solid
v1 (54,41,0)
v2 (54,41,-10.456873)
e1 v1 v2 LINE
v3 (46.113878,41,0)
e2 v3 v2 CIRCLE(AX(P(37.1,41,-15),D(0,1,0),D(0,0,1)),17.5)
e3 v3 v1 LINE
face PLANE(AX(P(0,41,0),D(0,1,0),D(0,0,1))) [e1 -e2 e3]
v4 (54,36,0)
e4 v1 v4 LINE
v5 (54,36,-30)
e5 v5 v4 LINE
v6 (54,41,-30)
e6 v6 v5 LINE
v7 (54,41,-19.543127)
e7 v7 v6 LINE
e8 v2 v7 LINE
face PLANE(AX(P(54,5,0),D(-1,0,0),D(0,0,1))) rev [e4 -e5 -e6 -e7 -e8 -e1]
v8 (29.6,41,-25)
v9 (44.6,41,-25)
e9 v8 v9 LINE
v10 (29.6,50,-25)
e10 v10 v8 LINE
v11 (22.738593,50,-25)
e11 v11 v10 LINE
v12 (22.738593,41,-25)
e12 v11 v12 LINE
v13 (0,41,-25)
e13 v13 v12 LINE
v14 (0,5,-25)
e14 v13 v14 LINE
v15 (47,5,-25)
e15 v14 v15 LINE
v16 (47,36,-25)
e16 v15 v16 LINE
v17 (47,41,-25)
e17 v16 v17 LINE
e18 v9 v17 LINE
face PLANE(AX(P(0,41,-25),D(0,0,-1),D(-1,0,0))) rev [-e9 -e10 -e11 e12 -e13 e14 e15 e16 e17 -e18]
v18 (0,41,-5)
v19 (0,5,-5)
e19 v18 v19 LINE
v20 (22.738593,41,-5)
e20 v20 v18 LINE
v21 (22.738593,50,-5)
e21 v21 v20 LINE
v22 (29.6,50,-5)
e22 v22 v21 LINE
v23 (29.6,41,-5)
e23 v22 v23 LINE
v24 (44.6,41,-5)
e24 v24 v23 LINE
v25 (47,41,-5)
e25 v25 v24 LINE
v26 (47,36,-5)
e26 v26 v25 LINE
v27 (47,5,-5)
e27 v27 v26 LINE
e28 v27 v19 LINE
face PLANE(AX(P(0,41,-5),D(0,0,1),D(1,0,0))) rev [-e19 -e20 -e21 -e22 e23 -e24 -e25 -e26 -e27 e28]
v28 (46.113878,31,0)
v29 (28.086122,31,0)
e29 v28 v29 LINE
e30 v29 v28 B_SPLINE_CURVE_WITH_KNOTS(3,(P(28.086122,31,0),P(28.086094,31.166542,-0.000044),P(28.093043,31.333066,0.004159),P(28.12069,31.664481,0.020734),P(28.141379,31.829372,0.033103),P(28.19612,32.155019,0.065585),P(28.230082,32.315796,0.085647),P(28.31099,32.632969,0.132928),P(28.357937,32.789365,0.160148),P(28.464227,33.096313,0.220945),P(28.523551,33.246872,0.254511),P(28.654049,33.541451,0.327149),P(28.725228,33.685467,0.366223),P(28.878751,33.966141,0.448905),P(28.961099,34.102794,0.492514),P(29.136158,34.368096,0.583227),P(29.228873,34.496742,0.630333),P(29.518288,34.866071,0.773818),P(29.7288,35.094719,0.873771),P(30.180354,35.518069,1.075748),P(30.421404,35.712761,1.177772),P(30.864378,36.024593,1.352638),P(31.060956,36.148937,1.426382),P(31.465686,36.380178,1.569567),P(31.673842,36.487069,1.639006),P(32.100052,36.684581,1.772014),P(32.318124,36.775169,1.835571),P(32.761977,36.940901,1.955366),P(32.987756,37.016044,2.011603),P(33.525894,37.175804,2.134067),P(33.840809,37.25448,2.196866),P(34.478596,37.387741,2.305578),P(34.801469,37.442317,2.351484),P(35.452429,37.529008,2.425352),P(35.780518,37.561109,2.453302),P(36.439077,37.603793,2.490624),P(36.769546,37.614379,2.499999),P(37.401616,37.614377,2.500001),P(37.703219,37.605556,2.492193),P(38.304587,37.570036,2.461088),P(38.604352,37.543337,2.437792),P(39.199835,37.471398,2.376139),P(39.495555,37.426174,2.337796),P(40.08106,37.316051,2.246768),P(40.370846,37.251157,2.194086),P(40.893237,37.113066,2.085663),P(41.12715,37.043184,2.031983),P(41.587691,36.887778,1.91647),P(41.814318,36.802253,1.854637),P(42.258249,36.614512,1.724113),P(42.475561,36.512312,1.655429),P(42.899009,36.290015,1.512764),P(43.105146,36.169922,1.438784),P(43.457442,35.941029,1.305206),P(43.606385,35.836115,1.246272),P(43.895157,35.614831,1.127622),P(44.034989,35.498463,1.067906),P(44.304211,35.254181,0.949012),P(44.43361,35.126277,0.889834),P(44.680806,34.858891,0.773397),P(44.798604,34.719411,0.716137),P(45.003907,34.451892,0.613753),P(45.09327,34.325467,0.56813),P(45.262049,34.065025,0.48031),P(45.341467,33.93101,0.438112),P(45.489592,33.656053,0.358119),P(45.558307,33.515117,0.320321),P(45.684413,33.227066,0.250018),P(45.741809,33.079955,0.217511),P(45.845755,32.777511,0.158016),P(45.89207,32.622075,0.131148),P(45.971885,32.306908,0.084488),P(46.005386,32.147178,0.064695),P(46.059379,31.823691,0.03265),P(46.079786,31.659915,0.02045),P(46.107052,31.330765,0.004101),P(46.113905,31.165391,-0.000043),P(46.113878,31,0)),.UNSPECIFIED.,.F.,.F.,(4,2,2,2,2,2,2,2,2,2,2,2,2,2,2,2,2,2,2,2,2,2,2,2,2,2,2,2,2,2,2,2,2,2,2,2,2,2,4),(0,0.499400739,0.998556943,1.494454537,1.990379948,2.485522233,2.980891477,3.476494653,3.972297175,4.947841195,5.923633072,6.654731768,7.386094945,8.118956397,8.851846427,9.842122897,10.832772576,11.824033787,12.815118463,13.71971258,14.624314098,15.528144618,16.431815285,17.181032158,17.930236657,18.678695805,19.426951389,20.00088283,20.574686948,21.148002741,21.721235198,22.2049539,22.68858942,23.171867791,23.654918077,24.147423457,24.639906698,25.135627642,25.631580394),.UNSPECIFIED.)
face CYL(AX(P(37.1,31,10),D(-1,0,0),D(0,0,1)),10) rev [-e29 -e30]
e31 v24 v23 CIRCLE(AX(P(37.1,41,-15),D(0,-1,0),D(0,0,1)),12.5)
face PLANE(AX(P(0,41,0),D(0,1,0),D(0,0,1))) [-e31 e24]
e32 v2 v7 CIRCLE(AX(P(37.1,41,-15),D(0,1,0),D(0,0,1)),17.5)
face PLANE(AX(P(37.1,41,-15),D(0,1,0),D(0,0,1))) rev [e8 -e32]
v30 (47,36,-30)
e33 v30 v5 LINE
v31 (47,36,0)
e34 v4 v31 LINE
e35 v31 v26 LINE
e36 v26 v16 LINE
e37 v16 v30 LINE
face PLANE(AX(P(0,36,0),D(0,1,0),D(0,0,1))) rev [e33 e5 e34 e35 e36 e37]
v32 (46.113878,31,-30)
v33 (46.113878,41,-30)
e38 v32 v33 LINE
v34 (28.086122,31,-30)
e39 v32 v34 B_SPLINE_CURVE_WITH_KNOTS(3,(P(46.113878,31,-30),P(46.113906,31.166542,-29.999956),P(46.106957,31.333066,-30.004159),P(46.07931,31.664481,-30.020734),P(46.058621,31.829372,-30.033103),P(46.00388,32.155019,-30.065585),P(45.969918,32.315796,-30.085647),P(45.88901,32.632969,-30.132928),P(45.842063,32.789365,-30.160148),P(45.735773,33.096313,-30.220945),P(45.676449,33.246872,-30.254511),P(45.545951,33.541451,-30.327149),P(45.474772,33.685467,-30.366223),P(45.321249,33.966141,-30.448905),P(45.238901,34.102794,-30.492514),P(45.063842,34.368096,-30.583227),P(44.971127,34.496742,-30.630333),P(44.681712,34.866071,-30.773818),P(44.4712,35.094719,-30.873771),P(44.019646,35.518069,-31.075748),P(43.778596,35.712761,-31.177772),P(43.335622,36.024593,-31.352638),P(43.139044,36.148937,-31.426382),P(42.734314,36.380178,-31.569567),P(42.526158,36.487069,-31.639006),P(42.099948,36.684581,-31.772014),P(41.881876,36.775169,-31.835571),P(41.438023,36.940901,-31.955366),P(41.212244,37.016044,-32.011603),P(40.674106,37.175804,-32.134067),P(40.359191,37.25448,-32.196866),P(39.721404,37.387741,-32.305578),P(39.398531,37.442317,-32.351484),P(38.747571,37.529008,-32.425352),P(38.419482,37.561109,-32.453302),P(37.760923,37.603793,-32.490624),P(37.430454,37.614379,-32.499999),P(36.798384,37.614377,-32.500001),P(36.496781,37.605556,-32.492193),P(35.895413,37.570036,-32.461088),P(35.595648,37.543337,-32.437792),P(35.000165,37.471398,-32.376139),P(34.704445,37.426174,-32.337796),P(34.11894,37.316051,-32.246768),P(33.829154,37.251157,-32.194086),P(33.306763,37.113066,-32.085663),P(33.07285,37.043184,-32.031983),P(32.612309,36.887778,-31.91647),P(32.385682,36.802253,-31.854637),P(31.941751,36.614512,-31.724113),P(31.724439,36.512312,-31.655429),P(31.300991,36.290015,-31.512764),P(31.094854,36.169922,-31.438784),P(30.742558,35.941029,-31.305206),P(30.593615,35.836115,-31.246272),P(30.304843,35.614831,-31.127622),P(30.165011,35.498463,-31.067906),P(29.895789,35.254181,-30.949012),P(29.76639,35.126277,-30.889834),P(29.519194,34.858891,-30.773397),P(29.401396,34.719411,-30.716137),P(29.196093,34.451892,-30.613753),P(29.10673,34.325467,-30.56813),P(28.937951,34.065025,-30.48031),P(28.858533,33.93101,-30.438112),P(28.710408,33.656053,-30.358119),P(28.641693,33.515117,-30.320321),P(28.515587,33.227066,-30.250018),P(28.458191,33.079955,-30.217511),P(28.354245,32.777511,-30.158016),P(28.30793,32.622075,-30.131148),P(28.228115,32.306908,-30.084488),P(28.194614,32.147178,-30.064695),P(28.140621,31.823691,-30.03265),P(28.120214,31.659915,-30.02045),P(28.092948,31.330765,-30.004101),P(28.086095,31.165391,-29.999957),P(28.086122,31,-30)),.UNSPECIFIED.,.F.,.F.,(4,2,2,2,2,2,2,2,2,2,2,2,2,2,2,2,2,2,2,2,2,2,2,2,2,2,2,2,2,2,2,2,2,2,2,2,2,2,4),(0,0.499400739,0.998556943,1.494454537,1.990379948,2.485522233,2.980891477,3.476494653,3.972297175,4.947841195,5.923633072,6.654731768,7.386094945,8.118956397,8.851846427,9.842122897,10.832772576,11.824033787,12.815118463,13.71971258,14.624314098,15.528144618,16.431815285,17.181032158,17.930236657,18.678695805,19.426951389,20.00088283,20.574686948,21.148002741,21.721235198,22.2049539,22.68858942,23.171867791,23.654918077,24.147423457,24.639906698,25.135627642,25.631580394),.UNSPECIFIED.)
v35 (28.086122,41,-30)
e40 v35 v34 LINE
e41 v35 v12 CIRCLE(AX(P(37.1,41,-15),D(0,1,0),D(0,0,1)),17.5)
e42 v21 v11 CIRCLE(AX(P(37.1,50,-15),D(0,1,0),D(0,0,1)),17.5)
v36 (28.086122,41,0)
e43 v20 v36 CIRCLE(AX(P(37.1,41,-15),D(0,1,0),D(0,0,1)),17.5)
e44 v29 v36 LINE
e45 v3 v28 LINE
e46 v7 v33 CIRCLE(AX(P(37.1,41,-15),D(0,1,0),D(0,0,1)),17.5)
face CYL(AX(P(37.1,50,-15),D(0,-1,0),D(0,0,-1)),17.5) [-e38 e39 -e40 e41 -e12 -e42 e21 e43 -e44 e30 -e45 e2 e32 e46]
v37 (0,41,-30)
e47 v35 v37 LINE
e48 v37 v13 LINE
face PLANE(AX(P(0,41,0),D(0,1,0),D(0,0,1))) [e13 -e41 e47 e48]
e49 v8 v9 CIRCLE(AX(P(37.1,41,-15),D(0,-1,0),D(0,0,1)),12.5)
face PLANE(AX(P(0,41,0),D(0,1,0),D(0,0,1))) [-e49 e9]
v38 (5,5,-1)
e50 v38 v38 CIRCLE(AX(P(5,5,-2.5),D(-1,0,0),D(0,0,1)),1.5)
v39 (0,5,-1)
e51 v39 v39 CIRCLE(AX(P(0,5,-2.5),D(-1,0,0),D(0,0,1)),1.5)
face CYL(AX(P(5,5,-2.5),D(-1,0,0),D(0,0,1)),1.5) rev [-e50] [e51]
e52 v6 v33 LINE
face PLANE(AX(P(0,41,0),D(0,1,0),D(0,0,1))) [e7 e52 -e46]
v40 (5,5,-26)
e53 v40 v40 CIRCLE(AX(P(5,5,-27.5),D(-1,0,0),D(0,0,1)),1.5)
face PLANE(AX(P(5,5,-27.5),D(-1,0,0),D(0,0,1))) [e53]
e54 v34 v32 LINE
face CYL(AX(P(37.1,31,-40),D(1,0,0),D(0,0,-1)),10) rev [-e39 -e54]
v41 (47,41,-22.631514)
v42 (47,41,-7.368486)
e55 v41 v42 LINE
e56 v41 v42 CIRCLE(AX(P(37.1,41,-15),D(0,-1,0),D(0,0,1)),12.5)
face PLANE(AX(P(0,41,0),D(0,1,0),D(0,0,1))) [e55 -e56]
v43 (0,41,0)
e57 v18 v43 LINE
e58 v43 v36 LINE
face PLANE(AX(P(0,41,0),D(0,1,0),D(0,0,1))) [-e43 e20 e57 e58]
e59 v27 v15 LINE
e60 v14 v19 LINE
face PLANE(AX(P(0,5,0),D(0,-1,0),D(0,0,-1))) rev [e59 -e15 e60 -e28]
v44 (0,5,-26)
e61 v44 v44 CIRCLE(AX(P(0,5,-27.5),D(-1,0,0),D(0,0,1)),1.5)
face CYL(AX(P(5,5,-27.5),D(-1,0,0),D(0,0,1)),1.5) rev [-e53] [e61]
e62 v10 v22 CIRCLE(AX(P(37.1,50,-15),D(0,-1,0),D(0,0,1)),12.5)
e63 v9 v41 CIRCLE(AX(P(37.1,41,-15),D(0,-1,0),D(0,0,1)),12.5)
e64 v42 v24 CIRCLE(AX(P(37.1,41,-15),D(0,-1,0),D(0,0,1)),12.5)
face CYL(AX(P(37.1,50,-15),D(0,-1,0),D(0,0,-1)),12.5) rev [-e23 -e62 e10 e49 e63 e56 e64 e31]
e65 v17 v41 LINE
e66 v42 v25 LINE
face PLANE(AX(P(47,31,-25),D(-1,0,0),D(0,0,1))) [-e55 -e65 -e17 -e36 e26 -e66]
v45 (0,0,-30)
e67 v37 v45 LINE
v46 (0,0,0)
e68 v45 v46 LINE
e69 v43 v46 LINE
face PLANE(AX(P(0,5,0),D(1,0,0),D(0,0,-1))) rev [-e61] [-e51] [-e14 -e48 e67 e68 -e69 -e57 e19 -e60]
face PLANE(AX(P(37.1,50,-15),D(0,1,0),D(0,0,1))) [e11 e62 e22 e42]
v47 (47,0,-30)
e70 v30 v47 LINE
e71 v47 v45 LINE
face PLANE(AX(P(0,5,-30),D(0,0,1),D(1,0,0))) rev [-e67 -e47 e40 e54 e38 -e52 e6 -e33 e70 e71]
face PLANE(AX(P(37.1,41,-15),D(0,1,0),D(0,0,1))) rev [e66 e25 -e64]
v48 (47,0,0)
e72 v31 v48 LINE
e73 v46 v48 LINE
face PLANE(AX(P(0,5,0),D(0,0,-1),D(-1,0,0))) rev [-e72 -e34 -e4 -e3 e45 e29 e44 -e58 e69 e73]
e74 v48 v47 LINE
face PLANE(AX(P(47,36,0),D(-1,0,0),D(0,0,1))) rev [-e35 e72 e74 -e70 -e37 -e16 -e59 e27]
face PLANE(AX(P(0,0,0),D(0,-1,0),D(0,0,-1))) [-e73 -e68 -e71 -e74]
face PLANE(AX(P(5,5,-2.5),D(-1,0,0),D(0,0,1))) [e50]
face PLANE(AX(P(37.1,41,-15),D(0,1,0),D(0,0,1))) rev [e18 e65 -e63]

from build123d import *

# Parameters (mm, degrees)
SKETCH1_W           = 54
SKETCH1_H           = 30
BOSS_EXTRUDE1_DEPTH = 5
SKETCH2_W           = 54
SKETCH2_H           = 5
BOSS_EXTRUDE2_DEPTH = 36
SKETCH3_W           = 7
SKETCH3_H           = 20
BOSS_EXTRUDE3_DEPTH = 10
SKETCH6_W           = 7
SKETCH6_H           = 30
CUT_EXTRUDE2_DEPTH  = 36
SKETCH7_R           = 1.5
CUT_EXTRUDE3_DEPTH  = 5
BOSS_EXTRUDE4_DEPTH = 9
FILLET1_R           = 10


with BuildPart() as part:
    # Sketch1 → Boss-Extrude1 (new body)
    with BuildSketch(Plane(origin=(0, 0, 0), x_dir=(1, 0, 0), z_dir=(0, 1, 0))):
        with Locations((27, 15)):
            Rectangle(SKETCH1_W, SKETCH1_H)
    extrude(amount=BOSS_EXTRUDE1_DEPTH)

    # Sketch2 → Boss-Extrude2 (add)
    with BuildSketch(Plane(origin=(0, 5, 0), x_dir=(1, 0, 0), z_dir=(0, 1, 0))):
        with Locations((27, 27.5)):
            Rectangle(SKETCH2_W, SKETCH2_H)
        with Locations((27, 2.5)):
            Rectangle(SKETCH2_W, SKETCH2_H)
    extrude(amount=BOSS_EXTRUDE2_DEPTH)

    # Sketch3 → Boss-Extrude3 (add)
    with BuildSketch(Plane(origin=(0, 41, 0), x_dir=(1, 0, 0), z_dir=(0, 1, 0))):
        with Locations((50.5, 15)):
            Rectangle(SKETCH3_W, SKETCH3_H)
    extrude(amount=-BOSS_EXTRUDE3_DEPTH)

    # Sketch6 → Cut-Extrude2 (cut)
    with BuildSketch(Plane.XZ):
        with Locations((50.5, -15)):
            Rectangle(SKETCH6_W, SKETCH6_H)
    extrude(amount=-CUT_EXTRUDE2_DEPTH, mode=Mode.SUBTRACT)

    # Sketch7 → Cut-Extrude3 (cut)
    with BuildSketch(Plane.ZY):
        with Locations((-27.5, 5)):
            Circle(SKETCH7_R)
        with Locations((-2.5, 5)):
            Circle(SKETCH7_R)
    extrude(amount=-CUT_EXTRUDE3_DEPTH, mode=Mode.SUBTRACT)

    # Sketch8 → Boss-Extrude4 (add)
    with BuildSketch(Plane(origin=(0, 41, 0), x_dir=(1, 0, 0), z_dir=(0, 1, 0))):
        with BuildLine():
            Line((22.738593384, 25), (29.6, 25))
            ThreePointArc((29.6, 25), (49.6, 15), (29.6, 5))
            Line((29.6, 5), (22.738593384, 5))
            ThreePointArc((22.738593384, 5), (54.6, 15), (22.738593384, 25))
        make_face()
    extrude(amount=BOSS_EXTRUDE4_DEPTH)

    # Fillet1
    # the kernel refuses this fillet: 10 mm, written as the material it adds along each edge
    with BuildSketch(Plane(origin=(3.086121811, 41, 0), x_dir=(0, -1, 0), z_dir=(1, 0, 0))) as fillet1_piece_1_section:
        with BuildLine():
            CenterArc((FILLET1_R, -FILLET1_R), FILLET1_R, 90, 90)
            Line((0, -FILLET1_R), (0, 0))
            Line((0, 0), (FILLET1_R, 0))
        make_face()
    fillet1_piece_1 = extrude(amount=68.027756377, mode=Mode.PRIVATE)
    fillet1_piece_1 = fillet1_piece_1 & Plane(origin=(37.1, 34.728997309, -15), x_dir=(-0.82065180664829, 0, 0.5714285714285713), z_dir=(0, -1, 0)) * Cylinder(17.5, 177, mode=Mode.PRIVATE)
    add(fillet1_piece_1)
    with BuildSketch(Plane(origin=(3.086121811, 41, -30), x_dir=(0, -1, 0), z_dir=(1, 0, 0))) as fillet1_piece_2_section:
        with BuildLine():
            CenterArc((FILLET1_R, FILLET1_R), FILLET1_R, 180, 90)
            Line((0, FILLET1_R), (0, 0))
            Line((0, 0), (FILLET1_R, 0))
        make_face()
    fillet1_piece_2 = extrude(amount=68.027756377, mode=Mode.PRIVATE)
    fillet1_piece_2 = fillet1_piece_2 & Plane(origin=(37.1, 34.728997309, -15), x_dir=(-0.82065180664829, 0, 0.5714285714285713), z_dir=(0, -1, 0)) * Cylinder(17.5, 177, mode=Mode.PRIVATE)
    add(fillet1_piece_2)


solid = part.part
